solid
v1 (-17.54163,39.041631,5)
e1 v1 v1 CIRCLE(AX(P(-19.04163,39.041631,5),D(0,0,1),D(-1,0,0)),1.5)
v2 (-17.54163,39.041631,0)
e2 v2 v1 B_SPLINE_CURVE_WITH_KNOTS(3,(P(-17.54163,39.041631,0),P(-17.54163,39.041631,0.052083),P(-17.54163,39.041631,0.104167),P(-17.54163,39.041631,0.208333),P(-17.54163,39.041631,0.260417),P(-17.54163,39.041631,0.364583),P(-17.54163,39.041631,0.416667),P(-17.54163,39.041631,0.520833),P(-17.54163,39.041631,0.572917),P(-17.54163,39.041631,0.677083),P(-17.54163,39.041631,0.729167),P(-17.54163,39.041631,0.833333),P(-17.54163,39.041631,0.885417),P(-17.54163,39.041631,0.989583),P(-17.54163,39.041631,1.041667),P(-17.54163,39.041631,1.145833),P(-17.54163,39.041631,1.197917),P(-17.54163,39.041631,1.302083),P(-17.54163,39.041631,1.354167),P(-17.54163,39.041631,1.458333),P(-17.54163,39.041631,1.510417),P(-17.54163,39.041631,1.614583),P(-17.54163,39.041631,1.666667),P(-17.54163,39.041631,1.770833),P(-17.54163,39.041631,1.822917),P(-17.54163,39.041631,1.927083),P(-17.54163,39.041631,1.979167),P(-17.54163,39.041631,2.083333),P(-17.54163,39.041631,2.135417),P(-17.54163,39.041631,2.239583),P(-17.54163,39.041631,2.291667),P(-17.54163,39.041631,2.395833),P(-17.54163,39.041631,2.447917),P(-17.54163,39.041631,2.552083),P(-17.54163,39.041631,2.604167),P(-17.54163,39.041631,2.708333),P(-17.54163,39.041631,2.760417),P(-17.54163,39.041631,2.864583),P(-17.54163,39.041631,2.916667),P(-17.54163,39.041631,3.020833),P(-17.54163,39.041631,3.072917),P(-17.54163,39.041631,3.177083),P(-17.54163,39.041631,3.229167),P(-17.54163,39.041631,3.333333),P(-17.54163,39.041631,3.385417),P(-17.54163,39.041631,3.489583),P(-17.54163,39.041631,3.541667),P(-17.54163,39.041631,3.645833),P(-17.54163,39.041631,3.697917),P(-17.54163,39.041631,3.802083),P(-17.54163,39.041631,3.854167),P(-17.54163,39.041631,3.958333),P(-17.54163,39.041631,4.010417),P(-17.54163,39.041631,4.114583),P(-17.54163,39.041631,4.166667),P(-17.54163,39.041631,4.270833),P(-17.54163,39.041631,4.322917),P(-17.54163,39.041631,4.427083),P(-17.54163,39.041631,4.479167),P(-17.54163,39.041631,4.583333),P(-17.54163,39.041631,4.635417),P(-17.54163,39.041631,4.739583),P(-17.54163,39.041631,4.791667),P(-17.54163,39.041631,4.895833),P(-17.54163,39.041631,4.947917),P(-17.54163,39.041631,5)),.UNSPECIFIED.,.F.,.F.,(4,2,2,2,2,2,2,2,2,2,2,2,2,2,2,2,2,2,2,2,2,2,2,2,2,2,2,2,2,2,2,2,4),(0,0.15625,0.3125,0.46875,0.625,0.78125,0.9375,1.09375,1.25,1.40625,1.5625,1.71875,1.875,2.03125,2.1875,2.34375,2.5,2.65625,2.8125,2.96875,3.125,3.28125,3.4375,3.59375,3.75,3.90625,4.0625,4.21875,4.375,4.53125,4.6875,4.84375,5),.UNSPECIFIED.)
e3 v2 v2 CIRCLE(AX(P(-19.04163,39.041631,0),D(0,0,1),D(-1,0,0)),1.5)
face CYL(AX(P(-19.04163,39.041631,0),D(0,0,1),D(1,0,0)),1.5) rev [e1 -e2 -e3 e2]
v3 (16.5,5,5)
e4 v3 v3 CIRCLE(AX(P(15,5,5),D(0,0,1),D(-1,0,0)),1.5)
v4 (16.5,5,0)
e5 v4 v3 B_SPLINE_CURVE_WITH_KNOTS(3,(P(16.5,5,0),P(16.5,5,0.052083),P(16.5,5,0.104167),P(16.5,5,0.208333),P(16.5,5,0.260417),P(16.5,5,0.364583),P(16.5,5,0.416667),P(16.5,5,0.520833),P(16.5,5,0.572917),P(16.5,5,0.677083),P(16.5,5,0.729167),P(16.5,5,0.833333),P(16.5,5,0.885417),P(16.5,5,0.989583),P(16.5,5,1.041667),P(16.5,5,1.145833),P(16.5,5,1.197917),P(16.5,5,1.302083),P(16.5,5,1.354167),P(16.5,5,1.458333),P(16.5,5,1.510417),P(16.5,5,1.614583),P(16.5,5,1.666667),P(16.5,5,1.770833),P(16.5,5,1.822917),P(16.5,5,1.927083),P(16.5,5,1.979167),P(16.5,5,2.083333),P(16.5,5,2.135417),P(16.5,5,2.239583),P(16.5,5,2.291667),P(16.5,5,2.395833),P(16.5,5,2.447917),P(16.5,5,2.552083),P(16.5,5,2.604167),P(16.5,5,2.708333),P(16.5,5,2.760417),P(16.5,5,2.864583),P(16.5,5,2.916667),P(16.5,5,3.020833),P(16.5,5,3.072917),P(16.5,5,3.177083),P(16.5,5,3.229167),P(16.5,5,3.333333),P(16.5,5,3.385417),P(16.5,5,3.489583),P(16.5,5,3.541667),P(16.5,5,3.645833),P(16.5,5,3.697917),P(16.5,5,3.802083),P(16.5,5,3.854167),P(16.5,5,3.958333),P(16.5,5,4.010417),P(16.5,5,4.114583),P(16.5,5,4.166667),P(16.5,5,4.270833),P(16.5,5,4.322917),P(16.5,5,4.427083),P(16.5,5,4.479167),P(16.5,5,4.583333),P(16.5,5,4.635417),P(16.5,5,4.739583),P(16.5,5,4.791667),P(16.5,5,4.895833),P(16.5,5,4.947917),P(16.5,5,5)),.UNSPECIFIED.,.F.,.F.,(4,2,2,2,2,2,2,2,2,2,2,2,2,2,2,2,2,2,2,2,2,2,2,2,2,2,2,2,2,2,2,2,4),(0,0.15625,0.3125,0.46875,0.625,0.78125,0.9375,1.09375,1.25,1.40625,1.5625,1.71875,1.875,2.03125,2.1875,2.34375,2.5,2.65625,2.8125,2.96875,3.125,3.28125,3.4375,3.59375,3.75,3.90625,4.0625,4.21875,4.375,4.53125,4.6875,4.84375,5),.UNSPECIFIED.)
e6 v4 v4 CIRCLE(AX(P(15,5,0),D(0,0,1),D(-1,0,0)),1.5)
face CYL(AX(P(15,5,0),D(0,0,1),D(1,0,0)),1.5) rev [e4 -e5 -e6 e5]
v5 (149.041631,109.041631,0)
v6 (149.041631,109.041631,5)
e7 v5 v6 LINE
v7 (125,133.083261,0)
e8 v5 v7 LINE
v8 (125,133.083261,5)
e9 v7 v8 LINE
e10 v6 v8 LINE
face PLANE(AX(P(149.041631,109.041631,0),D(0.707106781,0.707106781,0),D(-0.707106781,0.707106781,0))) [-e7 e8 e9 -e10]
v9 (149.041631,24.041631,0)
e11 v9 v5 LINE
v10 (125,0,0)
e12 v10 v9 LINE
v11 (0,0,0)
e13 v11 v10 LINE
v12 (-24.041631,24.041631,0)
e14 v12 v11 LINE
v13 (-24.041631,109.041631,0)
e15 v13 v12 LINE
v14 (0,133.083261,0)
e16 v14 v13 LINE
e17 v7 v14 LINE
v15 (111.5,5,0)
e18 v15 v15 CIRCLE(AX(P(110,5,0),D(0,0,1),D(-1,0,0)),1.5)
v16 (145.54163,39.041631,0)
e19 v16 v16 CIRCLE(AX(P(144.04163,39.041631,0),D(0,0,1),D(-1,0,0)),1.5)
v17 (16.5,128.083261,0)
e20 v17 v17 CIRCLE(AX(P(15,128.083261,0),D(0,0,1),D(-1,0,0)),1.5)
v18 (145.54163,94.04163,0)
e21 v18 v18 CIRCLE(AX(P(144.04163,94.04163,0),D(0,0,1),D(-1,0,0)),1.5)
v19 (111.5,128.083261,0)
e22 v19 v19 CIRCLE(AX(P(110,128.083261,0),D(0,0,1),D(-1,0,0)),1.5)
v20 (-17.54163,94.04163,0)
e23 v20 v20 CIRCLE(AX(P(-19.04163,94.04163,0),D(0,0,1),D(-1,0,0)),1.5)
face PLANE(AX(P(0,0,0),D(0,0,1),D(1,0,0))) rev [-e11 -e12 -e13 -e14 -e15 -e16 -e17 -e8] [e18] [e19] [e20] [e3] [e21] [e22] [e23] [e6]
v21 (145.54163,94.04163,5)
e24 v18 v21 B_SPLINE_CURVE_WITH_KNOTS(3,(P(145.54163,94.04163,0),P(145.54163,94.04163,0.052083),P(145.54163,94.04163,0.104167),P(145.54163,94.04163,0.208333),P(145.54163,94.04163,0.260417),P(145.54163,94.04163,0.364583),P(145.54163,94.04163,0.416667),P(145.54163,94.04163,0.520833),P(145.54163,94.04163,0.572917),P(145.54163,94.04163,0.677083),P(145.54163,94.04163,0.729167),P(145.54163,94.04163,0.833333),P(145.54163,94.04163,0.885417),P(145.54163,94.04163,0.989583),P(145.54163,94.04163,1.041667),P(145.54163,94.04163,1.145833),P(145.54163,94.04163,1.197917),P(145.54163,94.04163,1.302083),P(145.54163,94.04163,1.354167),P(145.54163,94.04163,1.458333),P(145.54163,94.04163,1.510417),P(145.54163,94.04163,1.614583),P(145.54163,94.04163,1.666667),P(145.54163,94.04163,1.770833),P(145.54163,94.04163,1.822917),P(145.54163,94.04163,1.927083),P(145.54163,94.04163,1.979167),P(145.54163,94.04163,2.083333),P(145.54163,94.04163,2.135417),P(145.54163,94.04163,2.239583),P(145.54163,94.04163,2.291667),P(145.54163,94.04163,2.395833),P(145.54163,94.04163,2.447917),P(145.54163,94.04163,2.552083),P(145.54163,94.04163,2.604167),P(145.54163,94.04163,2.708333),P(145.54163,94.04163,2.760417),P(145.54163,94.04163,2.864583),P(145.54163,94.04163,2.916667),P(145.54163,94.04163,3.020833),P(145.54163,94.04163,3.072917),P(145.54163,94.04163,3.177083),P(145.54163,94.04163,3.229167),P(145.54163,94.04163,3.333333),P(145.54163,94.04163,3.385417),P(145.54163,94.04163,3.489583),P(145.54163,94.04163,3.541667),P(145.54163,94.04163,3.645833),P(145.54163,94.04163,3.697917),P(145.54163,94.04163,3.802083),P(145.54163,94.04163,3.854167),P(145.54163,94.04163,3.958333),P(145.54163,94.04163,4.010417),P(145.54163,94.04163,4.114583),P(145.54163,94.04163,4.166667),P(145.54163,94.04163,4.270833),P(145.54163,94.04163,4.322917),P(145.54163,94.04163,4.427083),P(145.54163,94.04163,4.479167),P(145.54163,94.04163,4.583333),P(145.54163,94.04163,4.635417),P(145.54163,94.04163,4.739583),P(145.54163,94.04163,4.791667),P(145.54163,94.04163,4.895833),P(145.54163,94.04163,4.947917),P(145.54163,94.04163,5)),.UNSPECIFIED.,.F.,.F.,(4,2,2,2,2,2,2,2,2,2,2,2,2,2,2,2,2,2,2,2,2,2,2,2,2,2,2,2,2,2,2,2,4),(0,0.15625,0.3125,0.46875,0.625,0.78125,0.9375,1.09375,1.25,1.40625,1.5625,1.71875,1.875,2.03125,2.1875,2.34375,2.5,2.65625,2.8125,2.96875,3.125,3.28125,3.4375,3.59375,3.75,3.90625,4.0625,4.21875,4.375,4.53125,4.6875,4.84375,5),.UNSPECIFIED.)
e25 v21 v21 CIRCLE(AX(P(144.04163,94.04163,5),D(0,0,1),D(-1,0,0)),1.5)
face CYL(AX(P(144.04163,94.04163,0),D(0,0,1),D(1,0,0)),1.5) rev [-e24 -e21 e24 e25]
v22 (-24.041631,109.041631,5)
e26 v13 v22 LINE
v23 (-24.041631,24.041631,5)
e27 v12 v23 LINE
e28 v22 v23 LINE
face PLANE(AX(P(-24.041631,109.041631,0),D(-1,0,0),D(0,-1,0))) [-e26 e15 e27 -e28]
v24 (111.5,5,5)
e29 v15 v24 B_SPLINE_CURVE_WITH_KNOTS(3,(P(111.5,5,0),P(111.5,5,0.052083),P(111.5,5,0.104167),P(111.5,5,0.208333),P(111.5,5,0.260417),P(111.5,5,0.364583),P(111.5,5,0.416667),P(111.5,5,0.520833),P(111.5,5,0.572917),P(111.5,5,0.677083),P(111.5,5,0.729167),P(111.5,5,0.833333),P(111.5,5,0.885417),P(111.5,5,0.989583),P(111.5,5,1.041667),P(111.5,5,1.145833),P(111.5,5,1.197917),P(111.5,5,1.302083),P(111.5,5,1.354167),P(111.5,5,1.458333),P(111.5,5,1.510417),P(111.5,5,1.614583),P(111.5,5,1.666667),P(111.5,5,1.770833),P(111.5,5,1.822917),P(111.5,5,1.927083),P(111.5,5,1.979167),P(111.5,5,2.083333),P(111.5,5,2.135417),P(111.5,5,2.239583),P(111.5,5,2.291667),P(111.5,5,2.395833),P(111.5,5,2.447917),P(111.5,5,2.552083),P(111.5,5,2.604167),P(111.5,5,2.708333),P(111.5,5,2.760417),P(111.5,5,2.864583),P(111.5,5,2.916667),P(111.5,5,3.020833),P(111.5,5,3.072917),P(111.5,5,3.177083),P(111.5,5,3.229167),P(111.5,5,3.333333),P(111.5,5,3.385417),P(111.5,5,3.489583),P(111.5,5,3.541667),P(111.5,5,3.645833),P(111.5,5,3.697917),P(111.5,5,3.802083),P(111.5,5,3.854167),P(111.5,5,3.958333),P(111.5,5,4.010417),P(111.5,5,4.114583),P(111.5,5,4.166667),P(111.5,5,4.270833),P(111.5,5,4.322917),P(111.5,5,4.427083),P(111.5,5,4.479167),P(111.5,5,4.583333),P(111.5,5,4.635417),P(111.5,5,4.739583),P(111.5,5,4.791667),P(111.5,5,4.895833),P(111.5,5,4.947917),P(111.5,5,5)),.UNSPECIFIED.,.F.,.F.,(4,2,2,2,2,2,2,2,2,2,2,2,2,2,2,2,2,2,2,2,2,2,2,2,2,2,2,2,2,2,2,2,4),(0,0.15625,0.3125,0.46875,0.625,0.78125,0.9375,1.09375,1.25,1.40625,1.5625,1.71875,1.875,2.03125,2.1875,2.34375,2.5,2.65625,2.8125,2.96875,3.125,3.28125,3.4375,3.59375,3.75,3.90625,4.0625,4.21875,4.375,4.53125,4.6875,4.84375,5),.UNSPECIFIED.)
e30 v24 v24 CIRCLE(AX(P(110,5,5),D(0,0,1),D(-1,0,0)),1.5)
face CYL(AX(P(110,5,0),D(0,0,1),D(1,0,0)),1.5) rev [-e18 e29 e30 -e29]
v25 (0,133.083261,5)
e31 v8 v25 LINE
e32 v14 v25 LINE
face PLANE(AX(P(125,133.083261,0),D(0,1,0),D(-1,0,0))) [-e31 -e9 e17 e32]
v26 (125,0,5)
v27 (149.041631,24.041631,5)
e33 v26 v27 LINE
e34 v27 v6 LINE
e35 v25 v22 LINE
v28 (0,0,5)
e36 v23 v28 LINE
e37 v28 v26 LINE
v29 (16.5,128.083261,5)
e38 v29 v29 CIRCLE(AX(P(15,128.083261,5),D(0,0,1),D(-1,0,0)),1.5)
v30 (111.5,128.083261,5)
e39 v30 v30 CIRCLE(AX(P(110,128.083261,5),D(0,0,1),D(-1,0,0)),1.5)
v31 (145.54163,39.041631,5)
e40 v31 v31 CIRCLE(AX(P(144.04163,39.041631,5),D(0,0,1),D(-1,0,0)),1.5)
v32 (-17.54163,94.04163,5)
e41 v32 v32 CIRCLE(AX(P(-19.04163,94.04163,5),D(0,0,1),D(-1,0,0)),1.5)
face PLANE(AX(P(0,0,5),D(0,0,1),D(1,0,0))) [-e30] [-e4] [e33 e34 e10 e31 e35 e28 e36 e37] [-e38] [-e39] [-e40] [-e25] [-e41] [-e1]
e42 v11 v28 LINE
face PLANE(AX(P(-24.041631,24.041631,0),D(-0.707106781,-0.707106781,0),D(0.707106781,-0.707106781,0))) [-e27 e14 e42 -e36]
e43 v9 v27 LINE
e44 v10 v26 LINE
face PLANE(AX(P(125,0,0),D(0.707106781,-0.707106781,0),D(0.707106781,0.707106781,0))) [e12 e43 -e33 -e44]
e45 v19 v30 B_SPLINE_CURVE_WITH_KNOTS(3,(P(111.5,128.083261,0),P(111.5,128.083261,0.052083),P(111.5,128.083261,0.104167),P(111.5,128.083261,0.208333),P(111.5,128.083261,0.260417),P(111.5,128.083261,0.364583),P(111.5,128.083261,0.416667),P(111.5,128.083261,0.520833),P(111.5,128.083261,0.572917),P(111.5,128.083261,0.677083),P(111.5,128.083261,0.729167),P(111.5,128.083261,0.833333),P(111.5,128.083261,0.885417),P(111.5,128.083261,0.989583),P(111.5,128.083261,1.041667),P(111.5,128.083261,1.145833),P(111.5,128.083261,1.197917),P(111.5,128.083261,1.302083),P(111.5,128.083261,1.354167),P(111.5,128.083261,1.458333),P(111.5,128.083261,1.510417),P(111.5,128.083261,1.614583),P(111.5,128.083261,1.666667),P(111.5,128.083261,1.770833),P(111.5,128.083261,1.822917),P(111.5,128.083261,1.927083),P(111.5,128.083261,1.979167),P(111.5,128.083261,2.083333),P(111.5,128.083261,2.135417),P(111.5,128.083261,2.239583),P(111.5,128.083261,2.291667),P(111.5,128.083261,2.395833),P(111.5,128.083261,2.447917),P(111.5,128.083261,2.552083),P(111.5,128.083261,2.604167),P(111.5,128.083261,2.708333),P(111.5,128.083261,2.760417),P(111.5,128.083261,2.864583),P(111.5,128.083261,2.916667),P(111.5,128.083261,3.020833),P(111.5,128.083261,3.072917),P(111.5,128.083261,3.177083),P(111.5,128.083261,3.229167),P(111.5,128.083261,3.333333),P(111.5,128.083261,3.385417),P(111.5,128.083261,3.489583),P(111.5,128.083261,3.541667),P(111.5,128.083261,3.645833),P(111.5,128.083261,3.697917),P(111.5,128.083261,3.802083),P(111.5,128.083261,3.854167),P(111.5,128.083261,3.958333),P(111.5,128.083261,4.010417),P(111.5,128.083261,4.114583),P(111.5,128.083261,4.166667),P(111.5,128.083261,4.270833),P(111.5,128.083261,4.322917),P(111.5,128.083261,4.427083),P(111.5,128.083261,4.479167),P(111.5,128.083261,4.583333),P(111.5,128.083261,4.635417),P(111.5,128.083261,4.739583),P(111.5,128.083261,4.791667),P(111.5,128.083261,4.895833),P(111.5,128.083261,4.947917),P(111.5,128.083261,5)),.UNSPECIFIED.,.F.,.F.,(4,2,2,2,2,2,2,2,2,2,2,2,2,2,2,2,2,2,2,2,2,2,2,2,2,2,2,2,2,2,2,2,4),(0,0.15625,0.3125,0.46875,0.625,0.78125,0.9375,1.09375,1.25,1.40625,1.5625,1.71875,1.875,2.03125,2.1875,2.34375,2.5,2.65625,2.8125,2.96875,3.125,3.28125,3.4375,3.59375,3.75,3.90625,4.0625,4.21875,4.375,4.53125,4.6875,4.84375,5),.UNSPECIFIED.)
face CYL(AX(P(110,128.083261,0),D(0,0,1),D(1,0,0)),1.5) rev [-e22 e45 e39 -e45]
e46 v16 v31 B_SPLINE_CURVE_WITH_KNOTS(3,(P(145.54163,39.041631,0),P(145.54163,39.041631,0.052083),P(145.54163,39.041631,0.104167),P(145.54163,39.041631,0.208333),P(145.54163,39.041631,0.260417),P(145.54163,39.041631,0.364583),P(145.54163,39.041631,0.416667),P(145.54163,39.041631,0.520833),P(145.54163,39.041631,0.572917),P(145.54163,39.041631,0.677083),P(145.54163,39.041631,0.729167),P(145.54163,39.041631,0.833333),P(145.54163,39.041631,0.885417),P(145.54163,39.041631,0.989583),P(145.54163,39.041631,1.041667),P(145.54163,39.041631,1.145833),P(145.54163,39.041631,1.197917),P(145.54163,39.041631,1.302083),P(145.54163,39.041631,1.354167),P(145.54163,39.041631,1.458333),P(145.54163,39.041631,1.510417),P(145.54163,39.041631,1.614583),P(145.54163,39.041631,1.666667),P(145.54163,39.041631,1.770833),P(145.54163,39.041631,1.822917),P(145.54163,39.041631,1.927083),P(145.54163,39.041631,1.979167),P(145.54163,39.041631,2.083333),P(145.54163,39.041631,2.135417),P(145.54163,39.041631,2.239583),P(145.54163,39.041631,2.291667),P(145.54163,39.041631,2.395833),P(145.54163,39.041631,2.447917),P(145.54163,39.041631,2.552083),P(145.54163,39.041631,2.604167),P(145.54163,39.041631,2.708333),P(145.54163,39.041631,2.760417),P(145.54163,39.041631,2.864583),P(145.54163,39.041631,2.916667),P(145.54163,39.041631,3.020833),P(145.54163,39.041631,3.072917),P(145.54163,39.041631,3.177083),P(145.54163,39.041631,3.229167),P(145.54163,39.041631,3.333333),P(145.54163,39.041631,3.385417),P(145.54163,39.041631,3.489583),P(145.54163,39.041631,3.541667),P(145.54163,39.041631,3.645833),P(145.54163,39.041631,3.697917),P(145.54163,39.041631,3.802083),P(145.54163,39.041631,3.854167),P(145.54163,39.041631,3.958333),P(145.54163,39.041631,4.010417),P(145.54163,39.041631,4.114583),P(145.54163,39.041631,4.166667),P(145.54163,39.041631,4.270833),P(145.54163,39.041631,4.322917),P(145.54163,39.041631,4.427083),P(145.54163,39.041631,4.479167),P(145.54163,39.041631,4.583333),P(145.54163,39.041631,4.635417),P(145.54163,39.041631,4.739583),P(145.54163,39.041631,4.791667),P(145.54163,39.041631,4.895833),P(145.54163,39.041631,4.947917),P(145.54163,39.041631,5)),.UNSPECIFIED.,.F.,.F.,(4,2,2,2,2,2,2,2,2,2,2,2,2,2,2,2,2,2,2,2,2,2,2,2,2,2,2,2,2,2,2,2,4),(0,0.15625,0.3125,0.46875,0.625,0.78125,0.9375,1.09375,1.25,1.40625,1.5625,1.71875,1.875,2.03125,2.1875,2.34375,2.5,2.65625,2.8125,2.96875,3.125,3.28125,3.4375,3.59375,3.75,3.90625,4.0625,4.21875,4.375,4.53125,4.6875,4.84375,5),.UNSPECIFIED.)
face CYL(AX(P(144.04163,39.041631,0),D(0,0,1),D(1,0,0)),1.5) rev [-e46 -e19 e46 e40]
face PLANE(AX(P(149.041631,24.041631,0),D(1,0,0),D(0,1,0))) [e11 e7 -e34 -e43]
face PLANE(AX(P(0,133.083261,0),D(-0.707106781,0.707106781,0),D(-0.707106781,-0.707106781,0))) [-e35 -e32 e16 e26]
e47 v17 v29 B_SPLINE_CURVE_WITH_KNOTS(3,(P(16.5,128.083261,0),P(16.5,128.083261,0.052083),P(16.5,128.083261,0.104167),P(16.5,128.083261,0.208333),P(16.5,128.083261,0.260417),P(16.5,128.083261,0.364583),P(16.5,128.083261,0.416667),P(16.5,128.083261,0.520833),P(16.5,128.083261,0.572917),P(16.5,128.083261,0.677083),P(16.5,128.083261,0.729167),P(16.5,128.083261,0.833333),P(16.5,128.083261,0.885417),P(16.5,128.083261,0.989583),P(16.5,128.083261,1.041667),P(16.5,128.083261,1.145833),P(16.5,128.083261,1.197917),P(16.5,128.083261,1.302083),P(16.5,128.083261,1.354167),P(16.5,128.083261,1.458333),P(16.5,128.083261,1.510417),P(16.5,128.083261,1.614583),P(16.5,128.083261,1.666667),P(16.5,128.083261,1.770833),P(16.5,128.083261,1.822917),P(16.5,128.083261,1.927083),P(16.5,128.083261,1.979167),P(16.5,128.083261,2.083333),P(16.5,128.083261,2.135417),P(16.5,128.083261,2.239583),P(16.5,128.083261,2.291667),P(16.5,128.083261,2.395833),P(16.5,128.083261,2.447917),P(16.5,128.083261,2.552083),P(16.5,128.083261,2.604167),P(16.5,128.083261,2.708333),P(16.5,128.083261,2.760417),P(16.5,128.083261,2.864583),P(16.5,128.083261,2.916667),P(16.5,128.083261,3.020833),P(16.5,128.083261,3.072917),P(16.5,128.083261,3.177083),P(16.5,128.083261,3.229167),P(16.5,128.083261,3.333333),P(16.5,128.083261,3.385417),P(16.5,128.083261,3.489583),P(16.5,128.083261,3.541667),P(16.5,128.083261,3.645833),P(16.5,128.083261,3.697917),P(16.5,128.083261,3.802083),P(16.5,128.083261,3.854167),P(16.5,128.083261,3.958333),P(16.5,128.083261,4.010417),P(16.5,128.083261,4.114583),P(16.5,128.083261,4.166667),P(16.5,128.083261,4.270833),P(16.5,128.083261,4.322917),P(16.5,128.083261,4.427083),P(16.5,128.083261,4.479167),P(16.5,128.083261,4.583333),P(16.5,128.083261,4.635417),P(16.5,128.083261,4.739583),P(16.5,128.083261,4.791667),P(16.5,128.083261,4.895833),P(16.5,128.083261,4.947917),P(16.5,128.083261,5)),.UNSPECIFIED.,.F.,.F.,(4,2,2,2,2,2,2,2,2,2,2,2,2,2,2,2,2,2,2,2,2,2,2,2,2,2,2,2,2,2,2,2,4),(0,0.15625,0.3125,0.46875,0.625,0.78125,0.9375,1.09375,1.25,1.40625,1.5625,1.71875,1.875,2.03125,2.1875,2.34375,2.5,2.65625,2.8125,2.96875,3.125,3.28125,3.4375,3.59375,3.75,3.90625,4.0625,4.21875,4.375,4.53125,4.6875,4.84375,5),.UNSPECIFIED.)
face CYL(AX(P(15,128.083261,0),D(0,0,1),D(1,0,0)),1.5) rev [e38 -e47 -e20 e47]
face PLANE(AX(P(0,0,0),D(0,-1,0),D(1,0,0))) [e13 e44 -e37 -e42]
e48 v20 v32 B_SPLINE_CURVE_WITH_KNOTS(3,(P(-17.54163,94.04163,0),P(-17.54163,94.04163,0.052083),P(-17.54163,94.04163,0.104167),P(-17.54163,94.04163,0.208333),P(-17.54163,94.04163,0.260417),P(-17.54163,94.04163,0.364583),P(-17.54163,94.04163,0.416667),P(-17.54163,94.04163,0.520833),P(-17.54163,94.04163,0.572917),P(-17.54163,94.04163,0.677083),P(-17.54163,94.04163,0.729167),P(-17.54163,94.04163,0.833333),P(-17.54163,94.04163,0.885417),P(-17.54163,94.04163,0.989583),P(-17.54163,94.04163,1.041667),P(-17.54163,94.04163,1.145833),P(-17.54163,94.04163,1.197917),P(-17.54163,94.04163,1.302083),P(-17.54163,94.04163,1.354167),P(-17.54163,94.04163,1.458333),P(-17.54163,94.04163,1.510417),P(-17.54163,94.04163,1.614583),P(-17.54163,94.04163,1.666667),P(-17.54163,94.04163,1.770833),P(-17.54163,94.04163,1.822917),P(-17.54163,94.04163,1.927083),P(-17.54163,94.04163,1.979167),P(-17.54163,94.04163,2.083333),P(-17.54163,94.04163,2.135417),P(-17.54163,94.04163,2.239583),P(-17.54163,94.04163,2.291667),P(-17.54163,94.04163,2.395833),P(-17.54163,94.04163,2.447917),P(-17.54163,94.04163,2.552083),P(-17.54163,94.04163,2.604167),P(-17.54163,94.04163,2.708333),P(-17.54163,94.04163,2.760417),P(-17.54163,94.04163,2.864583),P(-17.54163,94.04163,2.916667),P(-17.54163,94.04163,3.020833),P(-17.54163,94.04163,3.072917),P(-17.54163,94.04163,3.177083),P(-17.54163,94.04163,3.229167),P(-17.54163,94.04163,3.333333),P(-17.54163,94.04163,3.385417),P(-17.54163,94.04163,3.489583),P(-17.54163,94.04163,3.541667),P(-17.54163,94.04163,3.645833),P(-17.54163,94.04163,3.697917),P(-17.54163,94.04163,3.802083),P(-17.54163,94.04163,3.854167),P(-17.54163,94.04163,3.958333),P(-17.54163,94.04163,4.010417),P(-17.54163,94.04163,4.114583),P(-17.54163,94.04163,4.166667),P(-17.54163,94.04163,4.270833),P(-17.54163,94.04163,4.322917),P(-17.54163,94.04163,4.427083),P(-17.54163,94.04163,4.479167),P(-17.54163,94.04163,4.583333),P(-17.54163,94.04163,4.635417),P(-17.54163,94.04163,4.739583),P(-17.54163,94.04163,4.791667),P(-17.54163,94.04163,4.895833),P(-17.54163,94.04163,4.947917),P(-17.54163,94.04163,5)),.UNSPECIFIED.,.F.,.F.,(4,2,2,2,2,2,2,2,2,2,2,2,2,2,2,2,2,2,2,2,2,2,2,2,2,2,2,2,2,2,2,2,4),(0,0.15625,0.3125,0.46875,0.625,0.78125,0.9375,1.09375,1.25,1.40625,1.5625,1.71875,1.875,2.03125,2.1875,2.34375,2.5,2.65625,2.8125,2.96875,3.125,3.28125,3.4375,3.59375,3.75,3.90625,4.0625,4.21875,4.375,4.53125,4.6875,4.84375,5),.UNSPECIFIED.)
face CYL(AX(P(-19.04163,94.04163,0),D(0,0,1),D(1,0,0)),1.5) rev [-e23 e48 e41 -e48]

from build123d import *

# Parameters (mm, degrees)
SKETCH1_R             = 2.1
SKETCH1_R_2           = 1.5
BOSS_EXTRUDE1_DEPTH   = 5
DELETEFACE1_OUTLINE_R = 2.1
DELETEFACE1_DEPTH     = 5


# Read off the part's stored shape, not the designer's step: DeleteFace1
with BuildPart() as part:
    # Sketch1 → Boss-Extrude1 (new body)
    with BuildSketch(Plane.XY.offset(5)):
        Polygon((-24.04163056, 24.04163056), (0, 0), (125, 0), (149.04163056, 24.04163056), (149.04163056, 109.04163056), (125, 133.083261121), (0, 133.083261121), (-24.04163056, 109.04163056), align=None)
        with Locations((118.731419269, 101.776120312)):
            Circle(SKETCH1_R, mode=Mode.SUBTRACT)
        with Locations((78.347048523, 57.984145877)):
            Circle(SKETCH1_R, mode=Mode.SUBTRACT)
        with Locations((53.279835174, 85.131070757)):
            Circle(SKETCH1_R, mode=Mode.SUBTRACT)
        with Locations((46.652951477, 57.984145877)):
            Circle(SKETCH1_R, mode=Mode.SUBTRACT)
        with Locations((6.268580731, 31.307140809)):
            Circle(SKETCH1_R, mode=Mode.SUBTRACT)
        with Locations((6.268580731, 101.776120312)):
            Circle(SKETCH1_R, mode=Mode.SUBTRACT)
        with Locations((71.720164826, 47.952190364)):
            Circle(SKETCH1_R, mode=Mode.SUBTRACT)
        with Locations((78.347048523, 75.099115243)):
            Circle(SKETCH1_R, mode=Mode.SUBTRACT)
        with Locations((112.104535572, 111.808075826)):
            Circle(SKETCH1_R, mode=Mode.SUBTRACT)
        with Locations((118.731419269, 31.307140809)):
            Circle(SKETCH1_R, mode=Mode.SUBTRACT)
        with Locations((46.652951477, 75.099115243)):
            Circle(SKETCH1_R, mode=Mode.SUBTRACT)
        with Locations((53.279835174, 47.952190364)):
            Circle(SKETCH1_R, mode=Mode.SUBTRACT)
        with Locations((12.895464428, 21.275185295)):
            Circle(SKETCH1_R, mode=Mode.SUBTRACT)
        with Locations((12.895464428, 111.808075826)):
            Circle(SKETCH1_R, mode=Mode.SUBTRACT)
        with Locations((112.104535572, 21.275185295)):
            Circle(SKETCH1_R, mode=Mode.SUBTRACT)
        with Locations((71.720164826, 85.131070757)):
            Circle(SKETCH1_R, mode=Mode.SUBTRACT)
        with Locations((144.041630486, 94.041630337)):
            Circle(SKETCH1_R_2, mode=Mode.SUBTRACT)
        with Locations((-19.041630486, 39.041630784)):
            Circle(SKETCH1_R_2, mode=Mode.SUBTRACT)
        with Locations((144.041630486, 39.041630784)):
            Circle(SKETCH1_R_2, mode=Mode.SUBTRACT)
        with Locations((15.000000224, 5.000000075)):
            Circle(SKETCH1_R_2, mode=Mode.SUBTRACT)
        with Locations((109.999999776, 5.000000075)):
            Circle(SKETCH1_R_2, mode=Mode.SUBTRACT)
        with Locations((109.999999776, 128.083261046)):
            Circle(SKETCH1_R_2, mode=Mode.SUBTRACT)
        with Locations((15.000000224, 128.083261046)):
            Circle(SKETCH1_R_2, mode=Mode.SUBTRACT)
        with Locations((-19.041630486, 94.041630337)):
            Circle(SKETCH1_R_2, mode=Mode.SUBTRACT)
        Polygon((4.803542307, 37.516408095), (41.516606622, 61.768230885), (54.744873598, 41.742923077), (18.031809283, 17.491100287), align=None, mode=Mode.SUBTRACT)
        Polygon((18.031809283, 115.592160833), (54.744873598, 91.340338044), (41.516606622, 71.315030236), (4.803542307, 95.566853025), align=None, mode=Mode.SUBTRACT)
        Polygon((70.255126402, 41.742923077), (83.483393378, 61.768230885), (120.196457693, 37.516408095), (106.968190717, 17.491100287), align=None, mode=Mode.SUBTRACT)
        Polygon((83.483393378, 71.315030236), (70.255126402, 91.340338044), (106.968190717, 115.592160833), (120.196457693, 95.566853025), align=None, mode=Mode.SUBTRACT)
    extrude(amount=-BOSS_EXTRUDE1_DEPTH)

    # DeleteFace1 outline → DeleteFace1 (add)
    with BuildSketch(Plane.XY):
        Polygon((41.516606622, 61.768230885), (4.803542307, 37.516408095), (18.031809283, 17.491100287), (54.744873598, 41.742923077), align=None)
        Polygon((54.744873598, 91.340338044), (18.031809283, 115.592160833), (4.803542307, 95.566853025), (41.516606622, 71.315030236), align=None)
        Polygon((83.483393378, 61.768230885), (70.255126402, 41.742923077), (106.968190717, 17.491100287), (120.196457693, 37.516408095), align=None)
        Polygon((70.255126402, 91.340338044), (83.483393378, 71.315030236), (120.196457693, 95.566853025), (106.968190717, 115.592160833), align=None)
        with Locations((118.731419269, 101.776120312)):
            Circle(DELETEFACE1_OUTLINE_R)
        with Locations((78.347048523, 57.984145877)):
            Circle(DELETEFACE1_OUTLINE_R)
        with Locations((53.279835174, 85.131070757)):
            Circle(DELETEFACE1_OUTLINE_R)
        with Locations((46.652951477, 57.984145877)):
            Circle(DELETEFACE1_OUTLINE_R)
        with Locations((6.268580731, 31.307140809)):
            Circle(DELETEFACE1_OUTLINE_R)
        with Locations((6.268580731, 101.776120312)):
            Circle(DELETEFACE1_OUTLINE_R)
        with Locations((71.720164826, 47.952190364)):
            Circle(DELETEFACE1_OUTLINE_R)
        with Locations((78.347048523, 75.099115243)):
            Circle(DELETEFACE1_OUTLINE_R)
        with Locations((112.104535572, 111.808075826)):
            Circle(DELETEFACE1_OUTLINE_R)
        with Locations((118.731419269, 31.307140809)):
            Circle(DELETEFACE1_OUTLINE_R)
        with Locations((46.652951477, 75.099115243)):
            Circle(DELETEFACE1_OUTLINE_R)
        with Locations((53.279835174, 47.952190364)):
            Circle(DELETEFACE1_OUTLINE_R)
        with Locations((12.895464428, 21.275185295)):
            Circle(DELETEFACE1_OUTLINE_R)
        with Locations((12.895464428, 111.808075826)):
            Circle(DELETEFACE1_OUTLINE_R)
        with Locations((112.104535572, 21.275185295)):
            Circle(DELETEFACE1_OUTLINE_R)
        with Locations((71.720164826, 85.131070757)):
            Circle(DELETEFACE1_OUTLINE_R)
    extrude(amount=DELETEFACE1_DEPTH)


solid = part.part
